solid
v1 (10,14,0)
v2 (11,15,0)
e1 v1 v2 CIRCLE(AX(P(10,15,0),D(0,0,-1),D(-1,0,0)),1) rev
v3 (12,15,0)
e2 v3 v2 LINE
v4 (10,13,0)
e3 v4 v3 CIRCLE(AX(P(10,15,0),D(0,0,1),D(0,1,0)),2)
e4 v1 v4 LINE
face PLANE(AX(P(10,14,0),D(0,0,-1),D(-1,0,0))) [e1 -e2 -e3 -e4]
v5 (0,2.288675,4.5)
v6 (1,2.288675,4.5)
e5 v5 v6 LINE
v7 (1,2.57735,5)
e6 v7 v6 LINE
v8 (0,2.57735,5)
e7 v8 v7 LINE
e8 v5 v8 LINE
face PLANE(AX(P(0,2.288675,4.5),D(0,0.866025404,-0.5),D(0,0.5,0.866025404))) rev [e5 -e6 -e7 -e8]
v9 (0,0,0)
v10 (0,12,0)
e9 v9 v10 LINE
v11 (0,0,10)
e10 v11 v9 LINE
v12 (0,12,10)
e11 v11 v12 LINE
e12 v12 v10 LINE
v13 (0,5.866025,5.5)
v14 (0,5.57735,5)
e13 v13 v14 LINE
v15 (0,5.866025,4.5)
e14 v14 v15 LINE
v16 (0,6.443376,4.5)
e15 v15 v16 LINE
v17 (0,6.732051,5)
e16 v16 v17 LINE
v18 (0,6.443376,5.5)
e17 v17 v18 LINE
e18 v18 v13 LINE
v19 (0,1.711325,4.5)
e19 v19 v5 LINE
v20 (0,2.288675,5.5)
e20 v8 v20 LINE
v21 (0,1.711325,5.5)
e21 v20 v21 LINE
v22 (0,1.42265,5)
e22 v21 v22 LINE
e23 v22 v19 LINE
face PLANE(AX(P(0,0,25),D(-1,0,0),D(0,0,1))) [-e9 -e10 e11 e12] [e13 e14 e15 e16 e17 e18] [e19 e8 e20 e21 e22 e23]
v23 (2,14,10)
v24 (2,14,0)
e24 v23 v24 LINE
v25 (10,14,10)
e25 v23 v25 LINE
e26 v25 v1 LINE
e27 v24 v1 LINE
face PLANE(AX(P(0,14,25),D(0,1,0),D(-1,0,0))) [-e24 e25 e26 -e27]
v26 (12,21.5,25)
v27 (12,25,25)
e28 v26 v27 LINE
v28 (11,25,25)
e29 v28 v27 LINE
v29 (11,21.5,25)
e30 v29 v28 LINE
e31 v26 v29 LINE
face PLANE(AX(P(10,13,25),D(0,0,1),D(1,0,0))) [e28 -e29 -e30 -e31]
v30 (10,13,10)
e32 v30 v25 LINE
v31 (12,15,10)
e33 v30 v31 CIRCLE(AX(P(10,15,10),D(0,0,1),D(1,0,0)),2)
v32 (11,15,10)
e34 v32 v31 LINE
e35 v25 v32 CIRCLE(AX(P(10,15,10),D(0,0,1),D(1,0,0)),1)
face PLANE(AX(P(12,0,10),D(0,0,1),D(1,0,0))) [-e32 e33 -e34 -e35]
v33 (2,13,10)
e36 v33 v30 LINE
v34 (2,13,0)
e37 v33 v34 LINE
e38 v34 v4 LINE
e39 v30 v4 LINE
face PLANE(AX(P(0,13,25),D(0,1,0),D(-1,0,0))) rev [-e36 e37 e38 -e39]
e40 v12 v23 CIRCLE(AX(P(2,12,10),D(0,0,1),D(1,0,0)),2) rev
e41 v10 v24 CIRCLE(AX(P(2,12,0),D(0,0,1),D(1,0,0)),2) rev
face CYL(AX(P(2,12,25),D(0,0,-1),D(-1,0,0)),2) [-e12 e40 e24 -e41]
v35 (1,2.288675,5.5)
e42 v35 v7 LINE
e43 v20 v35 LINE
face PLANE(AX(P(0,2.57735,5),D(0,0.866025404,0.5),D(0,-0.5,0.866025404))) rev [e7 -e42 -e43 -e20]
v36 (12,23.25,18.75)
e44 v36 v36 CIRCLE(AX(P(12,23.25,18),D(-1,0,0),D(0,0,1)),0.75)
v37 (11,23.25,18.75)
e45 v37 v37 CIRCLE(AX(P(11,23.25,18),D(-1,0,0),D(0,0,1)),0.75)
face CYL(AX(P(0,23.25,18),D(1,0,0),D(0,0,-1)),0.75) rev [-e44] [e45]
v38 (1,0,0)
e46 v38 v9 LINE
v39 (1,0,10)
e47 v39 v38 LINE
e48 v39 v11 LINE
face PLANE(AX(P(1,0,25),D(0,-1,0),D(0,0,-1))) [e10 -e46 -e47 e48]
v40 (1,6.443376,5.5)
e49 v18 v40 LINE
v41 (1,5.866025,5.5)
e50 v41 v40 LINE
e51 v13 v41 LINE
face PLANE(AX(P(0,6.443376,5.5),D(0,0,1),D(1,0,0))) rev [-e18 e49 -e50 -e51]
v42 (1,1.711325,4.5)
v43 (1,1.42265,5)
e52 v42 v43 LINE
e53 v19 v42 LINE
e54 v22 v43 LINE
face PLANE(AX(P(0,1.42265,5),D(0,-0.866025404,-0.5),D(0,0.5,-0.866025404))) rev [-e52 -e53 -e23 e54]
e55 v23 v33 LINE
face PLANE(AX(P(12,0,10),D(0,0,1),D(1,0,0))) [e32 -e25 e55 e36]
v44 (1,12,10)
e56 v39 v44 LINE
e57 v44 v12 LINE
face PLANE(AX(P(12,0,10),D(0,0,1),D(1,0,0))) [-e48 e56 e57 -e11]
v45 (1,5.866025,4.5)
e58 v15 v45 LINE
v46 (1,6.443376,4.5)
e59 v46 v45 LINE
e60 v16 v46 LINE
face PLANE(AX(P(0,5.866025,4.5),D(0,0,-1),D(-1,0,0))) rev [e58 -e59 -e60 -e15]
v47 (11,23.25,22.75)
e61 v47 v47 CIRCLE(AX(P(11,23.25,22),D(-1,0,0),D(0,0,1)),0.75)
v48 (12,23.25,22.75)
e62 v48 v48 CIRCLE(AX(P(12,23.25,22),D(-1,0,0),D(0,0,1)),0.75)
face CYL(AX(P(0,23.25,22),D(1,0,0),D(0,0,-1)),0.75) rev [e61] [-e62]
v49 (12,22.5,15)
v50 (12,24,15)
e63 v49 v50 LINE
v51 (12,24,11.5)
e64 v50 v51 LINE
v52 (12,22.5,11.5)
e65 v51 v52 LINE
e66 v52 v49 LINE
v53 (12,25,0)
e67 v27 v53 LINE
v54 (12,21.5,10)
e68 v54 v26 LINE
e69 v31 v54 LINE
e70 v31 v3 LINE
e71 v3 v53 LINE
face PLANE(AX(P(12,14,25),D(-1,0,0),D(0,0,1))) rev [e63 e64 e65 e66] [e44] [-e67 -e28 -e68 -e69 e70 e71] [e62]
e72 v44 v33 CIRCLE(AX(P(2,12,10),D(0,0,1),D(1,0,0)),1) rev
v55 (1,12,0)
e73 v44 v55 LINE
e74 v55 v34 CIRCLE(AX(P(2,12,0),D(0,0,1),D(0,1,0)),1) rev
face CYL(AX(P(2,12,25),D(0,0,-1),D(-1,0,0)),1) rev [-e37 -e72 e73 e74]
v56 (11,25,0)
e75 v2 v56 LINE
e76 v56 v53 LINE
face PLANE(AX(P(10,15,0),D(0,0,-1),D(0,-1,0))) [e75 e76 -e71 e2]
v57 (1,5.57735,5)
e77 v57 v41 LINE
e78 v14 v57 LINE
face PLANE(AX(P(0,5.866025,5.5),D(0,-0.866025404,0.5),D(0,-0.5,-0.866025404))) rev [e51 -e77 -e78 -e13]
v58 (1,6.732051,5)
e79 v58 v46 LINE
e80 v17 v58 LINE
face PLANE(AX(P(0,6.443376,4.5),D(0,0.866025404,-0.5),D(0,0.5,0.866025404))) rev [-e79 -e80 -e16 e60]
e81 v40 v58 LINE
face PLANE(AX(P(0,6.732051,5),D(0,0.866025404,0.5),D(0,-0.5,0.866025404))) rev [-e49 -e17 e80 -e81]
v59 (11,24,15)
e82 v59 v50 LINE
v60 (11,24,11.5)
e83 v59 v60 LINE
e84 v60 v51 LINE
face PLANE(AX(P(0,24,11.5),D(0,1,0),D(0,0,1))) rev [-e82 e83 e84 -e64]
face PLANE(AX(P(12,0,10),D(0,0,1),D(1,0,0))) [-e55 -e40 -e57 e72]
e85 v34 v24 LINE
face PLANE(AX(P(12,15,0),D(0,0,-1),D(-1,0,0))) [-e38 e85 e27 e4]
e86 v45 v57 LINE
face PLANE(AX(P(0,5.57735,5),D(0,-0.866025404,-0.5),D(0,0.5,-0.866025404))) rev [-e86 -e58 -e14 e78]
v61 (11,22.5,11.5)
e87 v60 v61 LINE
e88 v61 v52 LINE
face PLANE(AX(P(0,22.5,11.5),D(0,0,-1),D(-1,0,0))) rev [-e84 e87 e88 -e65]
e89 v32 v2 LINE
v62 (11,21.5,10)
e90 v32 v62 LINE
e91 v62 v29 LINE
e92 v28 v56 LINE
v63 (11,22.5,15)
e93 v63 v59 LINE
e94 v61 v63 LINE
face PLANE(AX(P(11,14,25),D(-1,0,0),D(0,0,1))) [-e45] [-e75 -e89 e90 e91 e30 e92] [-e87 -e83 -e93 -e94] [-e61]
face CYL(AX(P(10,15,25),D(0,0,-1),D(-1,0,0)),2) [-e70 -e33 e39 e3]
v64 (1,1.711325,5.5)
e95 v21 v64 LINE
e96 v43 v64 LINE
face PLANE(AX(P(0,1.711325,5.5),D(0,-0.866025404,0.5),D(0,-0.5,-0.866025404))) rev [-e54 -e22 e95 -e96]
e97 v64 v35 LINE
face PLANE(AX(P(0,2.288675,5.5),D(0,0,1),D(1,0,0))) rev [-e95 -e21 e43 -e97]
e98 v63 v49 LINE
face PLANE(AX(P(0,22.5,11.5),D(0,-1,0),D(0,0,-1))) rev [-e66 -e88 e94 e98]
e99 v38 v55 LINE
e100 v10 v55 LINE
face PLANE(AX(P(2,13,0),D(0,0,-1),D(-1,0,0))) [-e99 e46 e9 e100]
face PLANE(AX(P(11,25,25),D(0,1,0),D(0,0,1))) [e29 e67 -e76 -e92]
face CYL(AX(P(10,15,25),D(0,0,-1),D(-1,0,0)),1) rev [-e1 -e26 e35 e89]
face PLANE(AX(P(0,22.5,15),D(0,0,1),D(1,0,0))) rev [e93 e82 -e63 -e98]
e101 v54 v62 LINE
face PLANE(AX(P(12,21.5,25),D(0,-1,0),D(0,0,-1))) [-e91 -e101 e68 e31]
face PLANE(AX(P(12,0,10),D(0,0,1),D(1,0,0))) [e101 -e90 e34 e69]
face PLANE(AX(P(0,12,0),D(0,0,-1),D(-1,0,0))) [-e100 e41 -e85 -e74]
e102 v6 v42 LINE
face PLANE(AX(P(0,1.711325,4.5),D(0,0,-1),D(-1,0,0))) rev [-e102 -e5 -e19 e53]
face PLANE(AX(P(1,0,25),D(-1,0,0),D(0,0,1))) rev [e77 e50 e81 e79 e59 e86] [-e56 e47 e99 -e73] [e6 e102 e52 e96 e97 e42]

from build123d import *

# Parameters (mm, degrees)
BASE_FLANGE1_DEPTH      = 25
CUT_EXTRUDE1_DEPTH      = 38.336309405
CUT_EXTRUDE1_DEPTH_BACK = 38.336309405
SKETCH6_W               = 21.5
SKETCH6_H               = 15
CUT_EXTRUDE2_DEPTH      = 38.336309405
CUT_EXTRUDE2_DEPTH_BACK = 38.336309405
SKETCH7_R               = 0.75
SKETCH7_W               = 1.5
SKETCH7_H               = 3.5
CUT_EXTRUDE3_DEPTH      = 38.027017163
CUT_EXTRUDE3_DEPTH_BACK = 38.027017163


# Sheet-metal steps are written as plain solids
with BuildPart() as part:
    # Sketch1 → Base-Flange1 (new body)
    with BuildSketch(Plane(origin=(0, 0, 0), x_dir=(0, 1, 0), z_dir=(0, 0, 1))):
        with BuildLine():
            Line((0, 0), (12, 0))
            ThreePointArc((12, 0), (13.414213562, -0.585786438), (14, -2))
            Line((14, -2), (14, -10))
            ThreePointArc((14, -10), (14.292893219, -10.707106781), (15, -11))
            Line((15, -11), (25, -11))
            Line((25, -11), (25, -12))
            Line((25, -12), (15, -12))
            ThreePointArc((15, -12), (13.585786438, -11.414213562), (13, -10))
            Line((13, -10), (13, -2))
            ThreePointArc((13, -2), (12.707106781, -1.292893219), (12, -1))
            Line((12, -1), (0, -1))
            Line((0, -1), (0, 0))
        make_face()
    extrude(amount=BASE_FLANGE1_DEPTH)

    # Sketch6 → Cut-Extrude1 (cut, two sides: drawn at the far end of the back side and taken through both)
    with BuildSketch(Plane.YZ.offset(-CUT_EXTRUDE1_DEPTH_BACK)):
        with Locations((10.75, 17.5)):
            Rectangle(SKETCH6_W, SKETCH6_H)
    extrude(amount=CUT_EXTRUDE1_DEPTH + CUT_EXTRUDE1_DEPTH_BACK, mode=Mode.SUBTRACT)

    # Sketch7 → Cut-Extrude2 (cut, two sides: drawn at the far end of the back side and taken through both)
    with BuildSketch(Plane.YZ.offset(12).offset(-CUT_EXTRUDE2_DEPTH_BACK)):
        with Locations(Location((23.25, 22, 0), (0, 0, 90))):
            Circle(SKETCH7_R)
        with Locations(Location((23.25, 18, 0), (0, 0, 90))):
            Circle(SKETCH7_R)
        with Locations((23.25, 13.25)):
            Rectangle(SKETCH7_W, SKETCH7_H)
    extrude(amount=CUT_EXTRUDE2_DEPTH + CUT_EXTRUDE2_DEPTH_BACK, mode=Mode.SUBTRACT)

    # Sketch8 → Cut-Extrude3 (cut, two sides: drawn at the far end of the back side and taken through both)
    with BuildSketch(Plane.YZ.offset(1).offset(-CUT_EXTRUDE3_DEPTH_BACK)):
        Polygon((2.577350269, 5), (2.288675135, 5.5), (1.711324865, 5.5), (1.422649731, 5), (1.711324865, 4.5), (2.288675135, 4.5), align=None)
        Polygon((6.732050808, 5), (6.443375673, 5.5), (5.866025404, 5.5), (5.577350269, 5), (5.866025404, 4.5), (6.443375673, 4.5), align=None)
    extrude(amount=CUT_EXTRUDE3_DEPTH + CUT_EXTRUDE3_DEPTH_BACK, mode=Mode.SUBTRACT)


solid = part.part
